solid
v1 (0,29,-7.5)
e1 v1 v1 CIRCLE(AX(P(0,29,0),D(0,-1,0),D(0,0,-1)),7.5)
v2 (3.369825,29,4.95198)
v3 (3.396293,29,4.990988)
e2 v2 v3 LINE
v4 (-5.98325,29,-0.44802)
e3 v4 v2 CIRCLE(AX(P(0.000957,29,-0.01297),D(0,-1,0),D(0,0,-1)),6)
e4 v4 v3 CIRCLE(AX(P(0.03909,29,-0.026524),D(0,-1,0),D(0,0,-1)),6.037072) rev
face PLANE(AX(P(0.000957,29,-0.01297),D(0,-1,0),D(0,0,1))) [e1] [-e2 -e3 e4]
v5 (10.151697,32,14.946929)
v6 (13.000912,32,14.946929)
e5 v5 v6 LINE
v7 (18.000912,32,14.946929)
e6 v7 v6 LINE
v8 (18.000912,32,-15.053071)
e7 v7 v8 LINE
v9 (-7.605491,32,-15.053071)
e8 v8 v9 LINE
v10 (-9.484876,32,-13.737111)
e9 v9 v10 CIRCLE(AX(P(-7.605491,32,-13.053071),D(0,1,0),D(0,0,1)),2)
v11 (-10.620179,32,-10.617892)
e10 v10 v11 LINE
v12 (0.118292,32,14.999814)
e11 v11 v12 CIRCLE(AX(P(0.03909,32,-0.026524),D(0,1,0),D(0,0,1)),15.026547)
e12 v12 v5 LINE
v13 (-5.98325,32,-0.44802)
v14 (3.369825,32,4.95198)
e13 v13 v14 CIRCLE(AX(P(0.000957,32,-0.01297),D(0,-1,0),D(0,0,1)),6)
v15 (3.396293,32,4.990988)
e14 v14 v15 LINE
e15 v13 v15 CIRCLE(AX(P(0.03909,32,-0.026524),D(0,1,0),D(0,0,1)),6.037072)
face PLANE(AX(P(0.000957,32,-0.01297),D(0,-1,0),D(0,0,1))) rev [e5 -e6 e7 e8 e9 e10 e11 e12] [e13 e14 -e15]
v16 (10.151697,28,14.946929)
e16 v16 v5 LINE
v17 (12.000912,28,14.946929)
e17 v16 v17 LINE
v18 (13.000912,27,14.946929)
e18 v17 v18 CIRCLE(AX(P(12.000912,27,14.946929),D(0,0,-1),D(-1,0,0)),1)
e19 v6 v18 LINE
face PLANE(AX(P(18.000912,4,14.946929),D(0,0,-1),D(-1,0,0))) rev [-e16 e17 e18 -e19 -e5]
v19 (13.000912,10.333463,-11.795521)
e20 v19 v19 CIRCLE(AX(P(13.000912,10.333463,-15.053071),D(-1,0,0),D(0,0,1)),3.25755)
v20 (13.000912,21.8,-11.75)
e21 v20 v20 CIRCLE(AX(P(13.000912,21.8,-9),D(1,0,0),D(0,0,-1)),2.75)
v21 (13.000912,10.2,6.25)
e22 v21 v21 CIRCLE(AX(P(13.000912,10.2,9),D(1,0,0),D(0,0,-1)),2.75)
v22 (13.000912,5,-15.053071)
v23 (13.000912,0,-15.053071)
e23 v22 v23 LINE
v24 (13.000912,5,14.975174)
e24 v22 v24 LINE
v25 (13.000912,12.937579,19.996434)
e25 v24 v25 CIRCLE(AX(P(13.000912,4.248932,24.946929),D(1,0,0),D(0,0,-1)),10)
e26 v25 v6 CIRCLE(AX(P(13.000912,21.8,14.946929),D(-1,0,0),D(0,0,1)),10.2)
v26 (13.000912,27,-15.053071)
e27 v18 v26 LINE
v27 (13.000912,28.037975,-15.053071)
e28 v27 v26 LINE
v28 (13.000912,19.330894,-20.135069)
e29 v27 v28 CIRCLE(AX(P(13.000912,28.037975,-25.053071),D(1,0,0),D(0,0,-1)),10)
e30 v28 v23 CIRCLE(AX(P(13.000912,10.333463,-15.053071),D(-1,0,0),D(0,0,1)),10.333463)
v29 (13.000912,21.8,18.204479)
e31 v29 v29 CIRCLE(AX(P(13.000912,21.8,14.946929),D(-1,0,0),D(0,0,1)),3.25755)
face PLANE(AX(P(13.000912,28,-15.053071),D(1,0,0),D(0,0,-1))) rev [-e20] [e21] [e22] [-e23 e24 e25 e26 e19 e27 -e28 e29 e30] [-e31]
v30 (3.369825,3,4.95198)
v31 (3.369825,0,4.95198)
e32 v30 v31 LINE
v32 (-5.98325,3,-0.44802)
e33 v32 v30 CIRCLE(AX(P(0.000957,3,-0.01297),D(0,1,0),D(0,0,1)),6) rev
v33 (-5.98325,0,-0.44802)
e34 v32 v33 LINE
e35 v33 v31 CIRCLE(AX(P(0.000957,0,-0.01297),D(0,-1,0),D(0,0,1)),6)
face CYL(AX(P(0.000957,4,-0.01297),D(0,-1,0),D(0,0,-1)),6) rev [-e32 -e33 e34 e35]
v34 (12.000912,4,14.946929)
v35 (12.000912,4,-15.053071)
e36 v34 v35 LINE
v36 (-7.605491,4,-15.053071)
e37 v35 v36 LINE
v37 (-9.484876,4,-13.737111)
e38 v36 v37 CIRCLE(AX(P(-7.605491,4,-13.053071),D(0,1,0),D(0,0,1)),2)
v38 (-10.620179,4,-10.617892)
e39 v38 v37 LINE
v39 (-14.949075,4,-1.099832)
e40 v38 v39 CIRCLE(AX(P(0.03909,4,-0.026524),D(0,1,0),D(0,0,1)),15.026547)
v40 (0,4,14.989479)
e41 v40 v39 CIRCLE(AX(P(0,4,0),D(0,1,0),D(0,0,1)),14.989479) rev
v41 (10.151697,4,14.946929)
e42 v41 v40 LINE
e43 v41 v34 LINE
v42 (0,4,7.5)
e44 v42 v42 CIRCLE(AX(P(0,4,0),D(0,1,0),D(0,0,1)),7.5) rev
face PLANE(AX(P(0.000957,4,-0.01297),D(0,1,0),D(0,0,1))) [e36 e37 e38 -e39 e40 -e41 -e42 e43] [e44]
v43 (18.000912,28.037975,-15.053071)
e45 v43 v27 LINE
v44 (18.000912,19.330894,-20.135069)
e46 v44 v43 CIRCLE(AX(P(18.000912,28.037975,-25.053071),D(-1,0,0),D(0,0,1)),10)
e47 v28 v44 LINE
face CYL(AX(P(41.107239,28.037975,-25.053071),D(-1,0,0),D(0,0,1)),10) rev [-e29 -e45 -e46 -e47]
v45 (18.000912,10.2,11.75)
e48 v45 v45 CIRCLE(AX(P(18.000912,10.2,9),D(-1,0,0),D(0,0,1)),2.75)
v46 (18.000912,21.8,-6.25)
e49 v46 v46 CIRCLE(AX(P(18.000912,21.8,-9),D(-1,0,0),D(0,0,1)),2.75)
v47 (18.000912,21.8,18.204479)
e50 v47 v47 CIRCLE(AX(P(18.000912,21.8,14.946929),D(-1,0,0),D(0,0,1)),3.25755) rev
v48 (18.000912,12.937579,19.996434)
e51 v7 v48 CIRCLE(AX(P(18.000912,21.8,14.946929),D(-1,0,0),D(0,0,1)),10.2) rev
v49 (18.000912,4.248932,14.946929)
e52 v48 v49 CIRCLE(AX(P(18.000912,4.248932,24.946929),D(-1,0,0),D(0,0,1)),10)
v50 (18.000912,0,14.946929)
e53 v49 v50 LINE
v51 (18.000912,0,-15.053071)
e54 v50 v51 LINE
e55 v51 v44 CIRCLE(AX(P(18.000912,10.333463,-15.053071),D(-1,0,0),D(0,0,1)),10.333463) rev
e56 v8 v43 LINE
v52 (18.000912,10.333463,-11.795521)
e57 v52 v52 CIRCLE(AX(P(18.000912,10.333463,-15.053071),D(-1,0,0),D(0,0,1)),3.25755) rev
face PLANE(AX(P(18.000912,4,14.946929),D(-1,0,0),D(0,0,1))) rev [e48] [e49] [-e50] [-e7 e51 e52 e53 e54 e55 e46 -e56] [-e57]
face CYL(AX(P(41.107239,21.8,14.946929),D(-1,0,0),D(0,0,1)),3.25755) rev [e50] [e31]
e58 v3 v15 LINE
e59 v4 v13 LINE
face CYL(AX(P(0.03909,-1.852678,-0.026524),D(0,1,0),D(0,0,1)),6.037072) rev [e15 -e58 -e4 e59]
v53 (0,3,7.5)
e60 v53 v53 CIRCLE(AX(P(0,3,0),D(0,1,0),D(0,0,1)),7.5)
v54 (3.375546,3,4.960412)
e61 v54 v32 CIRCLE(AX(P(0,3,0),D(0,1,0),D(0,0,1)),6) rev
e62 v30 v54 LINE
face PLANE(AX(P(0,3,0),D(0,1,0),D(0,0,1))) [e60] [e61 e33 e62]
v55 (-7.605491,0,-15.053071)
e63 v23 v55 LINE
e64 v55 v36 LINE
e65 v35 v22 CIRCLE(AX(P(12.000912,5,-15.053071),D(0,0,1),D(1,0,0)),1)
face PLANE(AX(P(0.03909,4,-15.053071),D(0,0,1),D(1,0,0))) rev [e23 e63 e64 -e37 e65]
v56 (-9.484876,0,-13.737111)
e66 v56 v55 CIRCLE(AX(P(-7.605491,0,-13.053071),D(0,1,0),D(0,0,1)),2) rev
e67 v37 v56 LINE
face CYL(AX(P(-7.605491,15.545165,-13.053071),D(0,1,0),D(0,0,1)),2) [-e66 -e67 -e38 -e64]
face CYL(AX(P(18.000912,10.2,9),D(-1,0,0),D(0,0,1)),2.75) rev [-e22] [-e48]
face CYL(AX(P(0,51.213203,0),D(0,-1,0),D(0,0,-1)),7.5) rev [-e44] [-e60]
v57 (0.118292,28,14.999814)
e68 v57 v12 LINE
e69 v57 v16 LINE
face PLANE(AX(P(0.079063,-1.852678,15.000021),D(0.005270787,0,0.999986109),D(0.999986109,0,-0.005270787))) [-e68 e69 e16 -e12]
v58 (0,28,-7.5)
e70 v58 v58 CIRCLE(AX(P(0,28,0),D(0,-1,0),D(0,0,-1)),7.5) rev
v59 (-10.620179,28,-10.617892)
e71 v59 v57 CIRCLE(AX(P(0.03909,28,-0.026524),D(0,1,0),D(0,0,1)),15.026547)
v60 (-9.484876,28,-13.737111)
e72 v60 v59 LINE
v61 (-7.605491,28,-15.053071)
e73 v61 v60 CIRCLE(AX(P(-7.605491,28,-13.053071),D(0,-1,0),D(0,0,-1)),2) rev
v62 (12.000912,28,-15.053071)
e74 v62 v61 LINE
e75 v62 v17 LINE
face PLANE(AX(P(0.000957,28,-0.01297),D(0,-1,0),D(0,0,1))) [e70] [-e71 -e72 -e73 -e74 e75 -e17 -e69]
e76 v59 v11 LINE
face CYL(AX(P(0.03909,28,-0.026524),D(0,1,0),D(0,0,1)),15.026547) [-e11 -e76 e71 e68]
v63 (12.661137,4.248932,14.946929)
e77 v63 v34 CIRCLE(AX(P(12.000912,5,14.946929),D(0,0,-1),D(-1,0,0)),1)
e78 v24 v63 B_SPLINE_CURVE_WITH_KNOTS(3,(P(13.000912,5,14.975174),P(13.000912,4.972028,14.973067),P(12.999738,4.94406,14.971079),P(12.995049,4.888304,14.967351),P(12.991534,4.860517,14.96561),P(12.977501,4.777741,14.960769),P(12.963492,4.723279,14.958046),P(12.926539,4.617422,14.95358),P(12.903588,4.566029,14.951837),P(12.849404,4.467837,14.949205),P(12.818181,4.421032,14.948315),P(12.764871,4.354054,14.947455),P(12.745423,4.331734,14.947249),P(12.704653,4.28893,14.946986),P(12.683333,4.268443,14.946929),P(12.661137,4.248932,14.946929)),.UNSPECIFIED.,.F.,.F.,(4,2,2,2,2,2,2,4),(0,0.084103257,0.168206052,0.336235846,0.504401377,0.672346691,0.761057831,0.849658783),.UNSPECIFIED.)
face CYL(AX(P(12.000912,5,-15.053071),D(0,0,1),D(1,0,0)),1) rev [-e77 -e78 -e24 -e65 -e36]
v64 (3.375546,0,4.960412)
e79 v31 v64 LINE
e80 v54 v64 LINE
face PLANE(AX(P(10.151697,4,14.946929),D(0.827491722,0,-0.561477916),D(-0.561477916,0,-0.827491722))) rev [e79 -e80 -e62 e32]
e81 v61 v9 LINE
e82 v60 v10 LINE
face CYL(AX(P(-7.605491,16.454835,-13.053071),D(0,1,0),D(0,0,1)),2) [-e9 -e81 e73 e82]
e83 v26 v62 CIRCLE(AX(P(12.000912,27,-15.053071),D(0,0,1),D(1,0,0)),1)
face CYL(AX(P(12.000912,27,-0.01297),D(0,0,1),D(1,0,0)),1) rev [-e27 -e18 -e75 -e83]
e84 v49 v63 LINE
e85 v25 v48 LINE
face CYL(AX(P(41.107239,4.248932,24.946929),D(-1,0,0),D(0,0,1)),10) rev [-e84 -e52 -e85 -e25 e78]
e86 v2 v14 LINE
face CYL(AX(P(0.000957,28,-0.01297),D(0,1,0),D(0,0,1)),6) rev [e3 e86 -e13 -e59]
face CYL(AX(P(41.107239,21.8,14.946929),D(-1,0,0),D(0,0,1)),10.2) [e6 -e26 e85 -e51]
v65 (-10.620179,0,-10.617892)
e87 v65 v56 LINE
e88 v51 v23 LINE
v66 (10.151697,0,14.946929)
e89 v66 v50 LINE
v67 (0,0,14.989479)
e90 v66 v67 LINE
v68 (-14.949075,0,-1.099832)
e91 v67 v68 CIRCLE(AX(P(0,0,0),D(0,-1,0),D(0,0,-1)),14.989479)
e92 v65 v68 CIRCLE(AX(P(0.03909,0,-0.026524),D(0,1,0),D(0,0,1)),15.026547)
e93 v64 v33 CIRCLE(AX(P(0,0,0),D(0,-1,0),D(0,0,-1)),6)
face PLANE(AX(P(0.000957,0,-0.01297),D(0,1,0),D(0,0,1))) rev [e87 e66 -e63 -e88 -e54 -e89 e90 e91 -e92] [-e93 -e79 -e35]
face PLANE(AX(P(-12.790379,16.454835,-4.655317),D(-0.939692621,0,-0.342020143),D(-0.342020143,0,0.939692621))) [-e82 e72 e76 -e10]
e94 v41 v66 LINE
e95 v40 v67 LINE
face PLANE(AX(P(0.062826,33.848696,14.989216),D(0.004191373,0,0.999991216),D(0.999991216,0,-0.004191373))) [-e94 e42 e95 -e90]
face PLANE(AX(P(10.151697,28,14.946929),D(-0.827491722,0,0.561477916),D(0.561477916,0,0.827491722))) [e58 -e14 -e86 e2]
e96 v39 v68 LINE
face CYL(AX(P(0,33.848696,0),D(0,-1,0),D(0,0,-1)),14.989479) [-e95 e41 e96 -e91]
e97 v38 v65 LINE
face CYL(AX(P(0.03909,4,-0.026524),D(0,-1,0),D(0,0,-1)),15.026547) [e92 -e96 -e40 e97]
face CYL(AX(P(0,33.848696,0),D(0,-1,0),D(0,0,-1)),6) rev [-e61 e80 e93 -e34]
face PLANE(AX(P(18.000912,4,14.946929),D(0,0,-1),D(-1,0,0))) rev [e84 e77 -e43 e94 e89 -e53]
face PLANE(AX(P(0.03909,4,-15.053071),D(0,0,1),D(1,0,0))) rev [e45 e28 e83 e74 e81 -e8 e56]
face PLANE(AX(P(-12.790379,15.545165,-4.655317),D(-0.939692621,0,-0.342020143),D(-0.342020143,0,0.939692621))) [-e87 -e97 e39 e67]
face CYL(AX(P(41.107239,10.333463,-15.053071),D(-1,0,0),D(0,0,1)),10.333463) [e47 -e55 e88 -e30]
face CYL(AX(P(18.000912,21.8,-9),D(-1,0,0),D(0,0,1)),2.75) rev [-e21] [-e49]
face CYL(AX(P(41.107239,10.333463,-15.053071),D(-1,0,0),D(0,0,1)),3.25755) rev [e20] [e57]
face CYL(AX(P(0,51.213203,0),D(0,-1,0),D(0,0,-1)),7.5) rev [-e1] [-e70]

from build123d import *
from build123d.topology import SkipClean

# Parameters (mm, degrees)
BOSS_EXTRUDE1_DEPTH     = 4
SKETCH3_W               = 5
SKETCH3_H               = 30
BOSS_EXTRUDE3_DEPTH     = 24
BOSS_EXTRUDE5_DEPTH     = 5
SKETCH7_3_R             = 3.25755
CUT_EXTRUDE3_DEPTH      = 5
FILLET3_R               = 10
BOSS_EXTRUDE8_START     = -4
BOSS_EXTRUDE8_DEPTH     = 4
BOSS_EXTRUDE9_DEPTH     = 4
CUT_EXTRUDE4_DEPTH      = 25
CUT_EXTRUDE4_DEPTH_BACK = 1
SKETCH8_R               = 7.5
CUT_EXTRUDE5_DEPTH      = 50.517048882
CUT_EXTRUDE5_DEPTH_BACK = 50.517048882
SKETCH9_R               = 2.75
FILLET4_R               = 1
BOSS_EXTRUDE6_START     = -4
BOSS_EXTRUDE6_DEPTH     = 4
FILLET6_R               = 2
BOSS_EXTRUDE7_DEPTH     = 4


# Read off the part's stored shape, not the designer's step: Boss-Extrude8
with BuildPart() as part:
    # Sketch2 → Boss-Extrude1 (new body)
    with BuildSketch(Plane(origin=(0, 0, 0), x_dir=(1, 0, 0), z_dir=(0, 1, 0))):
        with BuildLine():
            Line((18.000912404, -14.946929254), (18.000912404, 15.053070746))
            Line((18.000912404, 15.053070746), (0.039090451, 15.053070746))
            ThreePointArc((0.039090451, 15.053070746), (-10.199781301, 11.024824414), (-14.94907539, 1.099832277))
            Line((-14.94907539, 1.099832277), (-5.983249792, 0.448020006))
            ThreePointArc((-5.983249792, 0.448020006), (3.000957071, 5.20912276), (3.369824569, -4.951979994))
            Line((3.369824569, -4.951979994), (10.151696986, -14.946929254))
            Line((10.151696986, -14.946929254), (18.000912404, -14.946929254))
        make_face()
    boss_extrude1 = extrude(amount=BOSS_EXTRUDE1_DEPTH)

    # Sketch3 → Boss-Extrude3 (add)
    with BuildSketch(Plane(origin=(0, 4, 0), x_dir=(1, 0, 0), z_dir=(0, 1, 0))):
        with Locations((15.500912404, 0.053070746)):
            Rectangle(SKETCH3_W, SKETCH3_H)
    extrude(amount=BOSS_EXTRUDE3_DEPTH)

    # Mirror1: Boss-Extrude1 across plane
    add(boss_extrude1.mirror(Plane.ZX.offset(16)))

    # Sketch7 → Boss-Extrude5 (add)
    with BuildSketch(Plane.ZY.offset(-13.000912404)):
        with BuildLine():
            Line((-15.053070746, 0), (-15.053070746, 4))
            Line((-15.053070746, 4), (-15.053070746, 7.075913265))
            ThreePointArc((-15.053070746, 7.075913265), (-18.310620746, 10.333463265), (-15.053070746, 13.591013265))
            Line((-15.053070746, 13.591013265), (-15.053070746, 20.666926531))
            ThreePointArc((-15.053070746, 20.666926531), (-25.386534011, 10.333463265), (-15.053070746, 0))
        make_face()
        with BuildLine():
            ThreePointArc((25.146929254, 21.8), (22.159418422, 29.012489168), (14.946929254, 32))
            Line((14.946929254, 32), (14.946929254, 28))
            Line((14.946929254, 28), (14.946929254, 25.05755))
            ThreePointArc((14.946929254, 25.05755), (17.250364949, 24.103435695), (18.204479254, 21.8))
            ThreePointArc((18.204479254, 21.8), (17.250364949, 19.496564305), (14.946929254, 18.54245))
            Line((14.946929254, 18.54245), (14.946929254, 11.6))
            ThreePointArc((14.946929254, 11.6), (22.159418422, 14.587510832), (25.146929254, 21.8))
        make_face()
        with BuildLine():
            Line((14.946929254, 28), (14.946929254, 32))
            ThreePointArc((14.946929254, 32), (4.746929254, 21.8), (14.946929254, 11.6))
            Line((14.946929254, 11.6), (14.946929254, 18.54245))
            ThreePointArc((14.946929254, 18.54245), (11.689379254, 21.8), (14.946929254, 25.05755))
            Line((14.946929254, 25.05755), (14.946929254, 28))
        make_face()
    extrude(amount=-BOSS_EXTRUDE5_DEPTH)

    # Sketch7<3> → Cut-Extrude3 (cut)
    with SkipClean():  # the faces are left unmerged after this step: merging them gives an invalid solid
        with BuildSketch(Plane.ZY.offset(-13.000912404)):
            with Locations((14.946929254, 21.8)):
                Circle(SKETCH7_3_R)
            with Locations((-15.053070746, 10.333463265)):
                Circle(SKETCH7_3_R)
        extrude(amount=-CUT_EXTRUDE3_DEPTH, mode=Mode.SUBTRACT)

    # Fillet3
    # the kernel refuses this fillet: 10 mm, written as the material it adds along each edge
    with BuildSketch(Plane(origin=(13.000912404, 20.666926531, -15.053070746), x_dir=(0, -0.25425566101904284, -0.9671370424297528), z_dir=(1, 0, 0))) as fillet3_piece_1:
        with BuildLine():
            CenterArc((7.797239676, 9.671370424), FILLET3_R, 194.729484057, 60.541031886)
            Line((-1.874130748, 7.128813814), (0, 0))
            ThreePointArc((0, 0), (2.627341533, 0.339588165), (5.254683066, 0))
        make_face()
    extrude(amount=5)
    with BuildSketch(Plane(origin=(13.000912404, 11.6, 14.946929254), x_dir=(0, -1, 0), z_dir=(1, 0, 0))) as fillet3_piece_2:
        with BuildLine():
            CenterArc((7.351068344, -10), FILLET3_R, 90, 60.326985198)
            ThreePointArc((-1.337579351, -5.04950495), (-0.340063626, -2.611829759), (0, 0))
            Line((0, 0), (7.351068344, 0))
        make_face()
    extrude(amount=5)

    # Boss-Extrude8 outline → Boss-Extrude8 (add)
    with SkipClean():  # the faces are left unmerged after this step: merging them gives an invalid solid
        with BuildSketch(Plane.XZ.offset(BOSS_EXTRUDE8_START)):
            with BuildLine():
                ThreePointArc((-5.983249792, -0.448020006), (-3.002134964, 5.194919216), (3.375546051, 4.960412166))
                Line((3.375546051, 4.960412166), (10.151696986, 14.946929254))
                Line((10.151696986, 14.946929254), (0, 14.989479178))
                ThreePointArc((0, 14.989479178), (-10.981129247, 10.202905787), (-14.94907539, -1.099832277))
                Line((-14.94907539, -1.099832277), (-5.983249792, -0.448020006))
            make_face()
        extrude(amount=BOSS_EXTRUDE8_DEPTH)

    # Sketch13 → Boss-Extrude9 (add)
    with SkipClean():  # the faces are left unmerged after this step: merging them gives an invalid solid
        with BuildSketch(Plane(origin=(0, 32, 0), x_dir=(1, 0, 0), z_dir=(0, 1, 0))):
            with BuildLine():
                Line((10.151696986, -14.946929254), (8.443727077, -12.429767101))
                ThreePointArc((8.443727077, -12.429767101), (4.471376939, -14.331468239), (0.118292185, -14.999813933))
                Line((0.118292185, -14.999813933), (10.151696986, -14.946929254))
            make_face()
            with BuildLine():
                ThreePointArc((6.07616266, 0.026524042), (5.364215569, -2.817642503), (3.396292996, -4.990988482))
                Line((3.396292996, -4.990988482), (8.443727077, -12.429767101))
                ThreePointArc((8.443727077, -12.429767101), (13.307281184, -7.027001355), (15.065637155, 0.026524042))
                ThreePointArc((15.065637155, 0.026524042), (10.664463523, 10.651897114), (0.039090451, 15.053070746))
                ThreePointArc((0.039090451, 15.053070746), (-10.199781301, 11.024824414), (-14.94907539, 1.099832277))
                Line((-14.94907539, 1.099832277), (-5.983249792, 0.448020006))
                ThreePointArc((-5.983249792, 0.448020006), (0.249967121, 6.059912135), (6.07616266, 0.026524042))
            make_face()
            with BuildLine():
                Line((8.443727077, -12.429767101), (3.396292996, -4.990988482))
                ThreePointArc((3.396292996, -4.990988482), (-2.989348597, -5.196003869), (-5.983249792, 0.448020006))
                Line((-5.983249792, 0.448020006), (-14.94907539, 1.099832277))
                ThreePointArc((-14.94907539, 1.099832277), (-10.932188175, -10.241297106), (0.118292185, -14.999813933))
                ThreePointArc((0.118292185, -14.999813933), (4.471376939, -14.331468239), (8.443727077, -12.429767101))
            make_face()
        extrude(amount=-BOSS_EXTRUDE9_DEPTH)

    # Sketch8 → Cut-Extrude4 (cut, two sides: drawn at the far end of the back side and taken through both)
    with SkipClean():  # the faces are left unmerged after this step: merging them gives an invalid solid
        with BuildSketch(Plane(origin=(0, 4, 0), x_dir=(1, 0, 0), z_dir=(0, 1, 0)).offset(-CUT_EXTRUDE4_DEPTH_BACK)):
            with Locations(Location((0, 0, 0), (0, 0, 90))):
                Circle(SKETCH8_R)
        extrude(amount=CUT_EXTRUDE4_DEPTH + CUT_EXTRUDE4_DEPTH_BACK, mode=Mode.SUBTRACT)

    # Sketch9 → Cut-Extrude5 (cut, two sides: drawn at the far end of the back side and taken through both)
    with BuildSketch(Plane.ZY.offset(-13.000912404).offset(-CUT_EXTRUDE5_DEPTH_BACK)):
        with Locations((9, 10.2)):
            Circle(SKETCH9_R)
        with Locations((-9, 21.8)):
            Circle(SKETCH9_R)
    extrude(amount=CUT_EXTRUDE5_DEPTH + CUT_EXTRUDE5_DEPTH_BACK, mode=Mode.SUBTRACT)

    # Fillet4
    fillet4_edges = [part.edges().sort_by_distance(p)[0] for p in [
        (13.000912404, 4, -0.053070746),
        (13.000912404, 28, -0.053070746),
    ]]
    fillet(fillet4_edges, radius=FILLET4_R)

    # Sketch10 → Boss-Extrude6 (add)
    with BuildSketch(Plane.XZ.offset(BOSS_EXTRUDE6_START)):
        with BuildLine():
            ThreePointArc((0.039090451, -15.053070746), (-5.733491903, -13.900038334), (-10.620178824, -10.617892431))
            Line((-10.620178824, -10.617892431), (-9.005905934, -15.053070746))
            Line((-9.005905934, -15.053070746), (0.039090451, -15.053070746))
        make_face()
    extrude(amount=BOSS_EXTRUDE6_DEPTH)

    # Fillet6
    fillet6_edges = [part.edges().sort_by_distance(p)[0] for p in [
        (-9.005905934, 2, -15.053070746),
    ]]
    fillet(fillet6_edges, radius=FILLET6_R)

    # Sketch11 → Boss-Extrude7 (add)
    with BuildSketch(Plane(origin=(0, 32, 0), x_dir=(1, 0, 0), z_dir=(0, 1, 0))):
        with BuildLine():
            Line((-9.484876099, 13.737111032), (-10.620178824, 10.617892431))
            ThreePointArc((-10.620178824, 10.617892431), (-5.733491903, 13.900038334), (0.039090451, 15.053070746))
            Line((0.039090451, 15.053070746), (-7.605490857, 15.053070746))
            ThreePointArc((-7.605490857, 15.053070746), (-8.75264373, 14.691374834), (-9.484876099, 13.737111032))
        make_face()
    extrude(amount=-BOSS_EXTRUDE7_DEPTH)


solid = part.part
